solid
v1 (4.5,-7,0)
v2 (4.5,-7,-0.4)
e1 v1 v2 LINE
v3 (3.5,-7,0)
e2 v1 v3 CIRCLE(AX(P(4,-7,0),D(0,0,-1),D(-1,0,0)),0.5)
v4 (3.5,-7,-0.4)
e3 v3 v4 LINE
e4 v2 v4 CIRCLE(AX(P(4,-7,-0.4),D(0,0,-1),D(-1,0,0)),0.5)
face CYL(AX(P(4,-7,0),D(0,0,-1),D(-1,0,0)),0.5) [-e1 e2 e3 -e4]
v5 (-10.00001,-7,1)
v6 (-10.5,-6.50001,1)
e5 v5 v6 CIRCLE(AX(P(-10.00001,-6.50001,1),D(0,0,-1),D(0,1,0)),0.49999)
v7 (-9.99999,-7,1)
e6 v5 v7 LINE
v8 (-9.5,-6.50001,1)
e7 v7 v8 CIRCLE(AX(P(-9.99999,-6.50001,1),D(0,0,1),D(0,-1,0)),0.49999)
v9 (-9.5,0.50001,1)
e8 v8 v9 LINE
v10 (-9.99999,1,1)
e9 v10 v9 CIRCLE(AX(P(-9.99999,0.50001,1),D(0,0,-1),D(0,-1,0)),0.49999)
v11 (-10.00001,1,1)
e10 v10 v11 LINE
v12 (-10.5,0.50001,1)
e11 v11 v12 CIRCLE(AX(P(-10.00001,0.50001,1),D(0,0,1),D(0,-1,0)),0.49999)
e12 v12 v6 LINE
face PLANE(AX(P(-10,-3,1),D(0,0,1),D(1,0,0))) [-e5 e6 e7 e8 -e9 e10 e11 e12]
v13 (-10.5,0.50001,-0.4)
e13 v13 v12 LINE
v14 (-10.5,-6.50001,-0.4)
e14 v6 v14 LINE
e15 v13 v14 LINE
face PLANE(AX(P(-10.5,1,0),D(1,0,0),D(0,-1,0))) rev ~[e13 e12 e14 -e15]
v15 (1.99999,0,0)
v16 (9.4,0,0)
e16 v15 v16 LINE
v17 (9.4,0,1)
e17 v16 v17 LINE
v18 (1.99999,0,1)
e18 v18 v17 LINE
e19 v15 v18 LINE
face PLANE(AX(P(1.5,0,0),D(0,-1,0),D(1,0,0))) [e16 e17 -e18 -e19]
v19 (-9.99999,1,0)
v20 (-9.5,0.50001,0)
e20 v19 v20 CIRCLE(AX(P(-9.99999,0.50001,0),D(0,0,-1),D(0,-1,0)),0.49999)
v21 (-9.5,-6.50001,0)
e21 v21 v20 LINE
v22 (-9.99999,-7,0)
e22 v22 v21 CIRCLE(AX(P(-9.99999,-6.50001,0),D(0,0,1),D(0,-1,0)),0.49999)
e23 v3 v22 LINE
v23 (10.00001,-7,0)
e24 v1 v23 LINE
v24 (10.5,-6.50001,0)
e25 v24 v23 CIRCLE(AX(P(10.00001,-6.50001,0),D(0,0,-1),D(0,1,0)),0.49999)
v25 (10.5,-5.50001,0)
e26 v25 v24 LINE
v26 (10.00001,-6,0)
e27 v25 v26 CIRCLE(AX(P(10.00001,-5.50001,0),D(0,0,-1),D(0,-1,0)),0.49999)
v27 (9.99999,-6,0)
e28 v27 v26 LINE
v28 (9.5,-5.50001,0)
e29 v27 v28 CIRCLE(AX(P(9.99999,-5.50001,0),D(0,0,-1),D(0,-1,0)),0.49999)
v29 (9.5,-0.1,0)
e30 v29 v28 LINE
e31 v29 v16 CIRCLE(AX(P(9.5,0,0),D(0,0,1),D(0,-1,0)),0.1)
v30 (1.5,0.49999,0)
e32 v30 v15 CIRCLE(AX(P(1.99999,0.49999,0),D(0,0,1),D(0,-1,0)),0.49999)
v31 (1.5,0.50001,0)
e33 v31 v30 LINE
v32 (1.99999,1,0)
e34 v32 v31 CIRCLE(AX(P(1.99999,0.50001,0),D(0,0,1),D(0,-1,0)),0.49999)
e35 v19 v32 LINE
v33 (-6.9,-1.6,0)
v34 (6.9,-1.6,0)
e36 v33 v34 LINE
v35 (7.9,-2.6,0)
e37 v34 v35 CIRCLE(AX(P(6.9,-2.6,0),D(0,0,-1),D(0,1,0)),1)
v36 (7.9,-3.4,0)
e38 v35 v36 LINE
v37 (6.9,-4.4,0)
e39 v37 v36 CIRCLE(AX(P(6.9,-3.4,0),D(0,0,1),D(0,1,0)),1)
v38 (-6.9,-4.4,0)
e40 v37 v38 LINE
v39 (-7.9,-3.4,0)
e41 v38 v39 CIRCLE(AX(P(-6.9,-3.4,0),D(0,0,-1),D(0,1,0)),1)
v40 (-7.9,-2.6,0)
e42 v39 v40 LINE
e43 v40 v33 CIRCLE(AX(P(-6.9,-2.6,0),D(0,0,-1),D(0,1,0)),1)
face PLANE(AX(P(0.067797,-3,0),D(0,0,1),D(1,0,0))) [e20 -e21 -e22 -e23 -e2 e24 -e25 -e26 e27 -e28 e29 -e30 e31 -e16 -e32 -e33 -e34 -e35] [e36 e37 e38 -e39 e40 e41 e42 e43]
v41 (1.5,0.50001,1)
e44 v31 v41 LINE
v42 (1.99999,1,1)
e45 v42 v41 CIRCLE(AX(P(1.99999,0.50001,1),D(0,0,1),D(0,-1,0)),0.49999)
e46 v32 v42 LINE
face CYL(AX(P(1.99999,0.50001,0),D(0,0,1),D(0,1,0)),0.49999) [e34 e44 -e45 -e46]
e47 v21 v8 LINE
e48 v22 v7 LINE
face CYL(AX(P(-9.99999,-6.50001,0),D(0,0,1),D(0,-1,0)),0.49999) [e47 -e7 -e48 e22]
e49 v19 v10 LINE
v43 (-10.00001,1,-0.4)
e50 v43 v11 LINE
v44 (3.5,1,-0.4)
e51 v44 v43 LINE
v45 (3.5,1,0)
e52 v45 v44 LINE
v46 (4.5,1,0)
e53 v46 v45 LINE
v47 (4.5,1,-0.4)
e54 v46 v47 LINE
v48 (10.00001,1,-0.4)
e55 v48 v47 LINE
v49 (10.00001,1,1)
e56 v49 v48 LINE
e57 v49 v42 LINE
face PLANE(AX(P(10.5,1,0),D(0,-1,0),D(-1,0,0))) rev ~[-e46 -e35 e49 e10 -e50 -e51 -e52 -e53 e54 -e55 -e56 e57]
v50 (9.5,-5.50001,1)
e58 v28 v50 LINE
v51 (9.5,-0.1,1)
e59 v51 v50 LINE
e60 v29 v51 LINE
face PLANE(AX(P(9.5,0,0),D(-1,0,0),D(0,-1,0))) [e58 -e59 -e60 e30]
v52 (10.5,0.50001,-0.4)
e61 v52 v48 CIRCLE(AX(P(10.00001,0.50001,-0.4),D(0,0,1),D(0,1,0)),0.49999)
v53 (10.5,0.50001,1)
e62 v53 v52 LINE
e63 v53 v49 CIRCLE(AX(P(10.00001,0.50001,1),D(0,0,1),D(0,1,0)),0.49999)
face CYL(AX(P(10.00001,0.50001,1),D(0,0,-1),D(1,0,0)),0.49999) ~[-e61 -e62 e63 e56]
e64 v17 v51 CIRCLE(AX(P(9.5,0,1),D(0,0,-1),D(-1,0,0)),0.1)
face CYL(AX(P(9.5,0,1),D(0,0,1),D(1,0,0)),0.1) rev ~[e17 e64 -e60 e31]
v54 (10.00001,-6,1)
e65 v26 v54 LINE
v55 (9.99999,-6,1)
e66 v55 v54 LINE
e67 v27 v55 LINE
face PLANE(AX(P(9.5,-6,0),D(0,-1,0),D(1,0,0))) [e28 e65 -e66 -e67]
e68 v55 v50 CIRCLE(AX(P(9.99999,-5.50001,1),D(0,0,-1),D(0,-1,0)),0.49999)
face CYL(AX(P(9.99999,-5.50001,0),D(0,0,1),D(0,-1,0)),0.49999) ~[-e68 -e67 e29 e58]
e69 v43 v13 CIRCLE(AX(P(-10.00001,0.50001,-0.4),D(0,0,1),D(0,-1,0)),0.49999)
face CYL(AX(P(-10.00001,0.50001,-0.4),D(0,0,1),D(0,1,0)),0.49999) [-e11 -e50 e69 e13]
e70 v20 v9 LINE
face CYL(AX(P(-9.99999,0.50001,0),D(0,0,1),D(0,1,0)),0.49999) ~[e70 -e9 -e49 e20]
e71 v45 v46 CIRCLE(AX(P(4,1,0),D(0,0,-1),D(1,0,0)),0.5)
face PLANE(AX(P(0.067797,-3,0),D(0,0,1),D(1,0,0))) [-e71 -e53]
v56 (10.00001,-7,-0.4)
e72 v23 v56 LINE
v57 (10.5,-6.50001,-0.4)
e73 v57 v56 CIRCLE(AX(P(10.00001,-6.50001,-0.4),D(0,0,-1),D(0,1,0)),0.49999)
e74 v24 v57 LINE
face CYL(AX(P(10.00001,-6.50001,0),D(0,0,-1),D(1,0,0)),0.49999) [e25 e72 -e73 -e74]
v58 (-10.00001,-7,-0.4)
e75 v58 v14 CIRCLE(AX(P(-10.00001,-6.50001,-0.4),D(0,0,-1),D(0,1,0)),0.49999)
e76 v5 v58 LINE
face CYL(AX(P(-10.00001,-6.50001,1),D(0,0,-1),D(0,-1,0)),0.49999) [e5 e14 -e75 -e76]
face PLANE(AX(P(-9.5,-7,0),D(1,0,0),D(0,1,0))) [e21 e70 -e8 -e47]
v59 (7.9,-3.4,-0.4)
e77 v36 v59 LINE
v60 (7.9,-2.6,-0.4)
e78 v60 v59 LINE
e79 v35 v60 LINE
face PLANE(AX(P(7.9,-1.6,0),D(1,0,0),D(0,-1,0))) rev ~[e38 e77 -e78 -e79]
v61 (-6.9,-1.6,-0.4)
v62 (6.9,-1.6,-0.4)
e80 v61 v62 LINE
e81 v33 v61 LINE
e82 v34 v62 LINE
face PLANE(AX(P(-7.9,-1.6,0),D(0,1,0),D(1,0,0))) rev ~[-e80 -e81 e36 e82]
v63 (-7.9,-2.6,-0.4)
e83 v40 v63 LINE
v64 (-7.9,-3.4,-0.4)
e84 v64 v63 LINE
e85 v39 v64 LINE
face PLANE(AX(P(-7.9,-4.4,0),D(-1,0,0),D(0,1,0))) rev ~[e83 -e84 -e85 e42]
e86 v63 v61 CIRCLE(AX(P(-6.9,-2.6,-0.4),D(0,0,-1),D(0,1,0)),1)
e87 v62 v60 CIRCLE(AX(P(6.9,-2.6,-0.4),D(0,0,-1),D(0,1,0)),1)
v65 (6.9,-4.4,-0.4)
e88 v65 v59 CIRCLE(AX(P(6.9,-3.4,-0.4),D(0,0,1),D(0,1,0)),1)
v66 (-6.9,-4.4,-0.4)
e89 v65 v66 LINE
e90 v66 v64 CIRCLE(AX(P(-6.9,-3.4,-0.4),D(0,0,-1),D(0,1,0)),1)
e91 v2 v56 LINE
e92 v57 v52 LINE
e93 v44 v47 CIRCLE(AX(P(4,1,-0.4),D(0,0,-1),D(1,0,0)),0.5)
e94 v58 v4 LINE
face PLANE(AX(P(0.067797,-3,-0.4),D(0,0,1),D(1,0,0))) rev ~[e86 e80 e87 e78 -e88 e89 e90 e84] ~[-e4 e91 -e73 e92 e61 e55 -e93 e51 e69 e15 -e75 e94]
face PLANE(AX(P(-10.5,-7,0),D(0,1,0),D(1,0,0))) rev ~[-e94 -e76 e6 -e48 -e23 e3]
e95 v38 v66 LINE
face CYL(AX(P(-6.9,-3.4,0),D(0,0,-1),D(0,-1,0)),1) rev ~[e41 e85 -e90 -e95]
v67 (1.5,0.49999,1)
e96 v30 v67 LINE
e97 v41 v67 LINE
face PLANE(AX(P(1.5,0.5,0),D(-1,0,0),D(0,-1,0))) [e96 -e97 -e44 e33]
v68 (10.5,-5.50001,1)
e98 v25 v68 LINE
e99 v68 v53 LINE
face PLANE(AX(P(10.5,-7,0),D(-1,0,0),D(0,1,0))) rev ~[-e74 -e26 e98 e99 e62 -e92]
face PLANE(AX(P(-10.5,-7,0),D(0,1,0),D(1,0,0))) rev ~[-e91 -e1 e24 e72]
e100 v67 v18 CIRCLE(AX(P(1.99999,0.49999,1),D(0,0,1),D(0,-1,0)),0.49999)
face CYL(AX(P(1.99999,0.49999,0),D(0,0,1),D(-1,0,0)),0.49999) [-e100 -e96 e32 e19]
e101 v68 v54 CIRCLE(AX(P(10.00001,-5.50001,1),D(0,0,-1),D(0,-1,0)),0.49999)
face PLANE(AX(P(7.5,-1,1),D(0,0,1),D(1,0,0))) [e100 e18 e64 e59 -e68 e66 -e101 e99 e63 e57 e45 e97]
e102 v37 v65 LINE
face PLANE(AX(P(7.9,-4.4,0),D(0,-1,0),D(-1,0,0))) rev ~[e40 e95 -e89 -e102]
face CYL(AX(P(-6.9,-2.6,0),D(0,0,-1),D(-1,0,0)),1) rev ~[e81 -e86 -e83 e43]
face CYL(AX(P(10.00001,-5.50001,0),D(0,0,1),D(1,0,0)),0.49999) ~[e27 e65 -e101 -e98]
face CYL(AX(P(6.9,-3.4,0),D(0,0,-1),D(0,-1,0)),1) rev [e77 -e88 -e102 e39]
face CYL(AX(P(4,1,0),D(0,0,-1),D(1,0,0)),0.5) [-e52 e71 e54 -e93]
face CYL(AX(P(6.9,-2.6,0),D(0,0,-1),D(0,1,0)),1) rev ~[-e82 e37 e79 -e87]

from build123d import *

# Parameters (mm, degrees)
F4_W     = 3
F4_H     = 1
F6_R     = 1
F7_R     = 0.49999
F8_R     = 0.1
F9_DEPTH = 1


# Not quite as in the source:
# - a fillet or chamfer is up to 0.001 mm smaller than in the source, because OpenCascade refuses the exact size


with BuildPart() as f3:
    # F3: sweep along a path in F1
    with BuildLine(Plane.XZ) as f3_path:
        Line((0, 0), (0, -0.4))
    # F2 (on Top) → F3 (sweep)
    with BuildSketch(Plane.XY):
        Polygon((10.5, -7), (10.5, 1), (4.5, 1), (3.5, 1), (-10.5, 1), (-10.5, -7), (3.5, -7), (4.5, -7), align=None)
        Polygon((-7.9, -4.4), (-7.9, -1.6), (-4.5, -1.6), (4.5, -1.6), (7.9, -1.6), (7.9, -4.4), align=None, mode=Mode.SUBTRACT)
        with BuildLine():
            Line((3.5, 1), (4.5, 1))
            ThreePointArc((4.5, 1), (4, 1.5), (3.5, 1))
        make_face()
        with BuildLine():
            ThreePointArc((3.5, -7), (4, -7.5), (4.5, -7))
            Line((4.5, -7), (3.5, -7))
        make_face()
    sweep(path=f3_path.line)

    # F5: sweep along a path in F1
    with BuildLine(Plane.XZ) as f5_path:
        Line((0, 0), (0, 1))
    # F4 (on face) → F5 (sweep)
    with BuildSketch(Plane.XY):
        Polygon((4.5, 0), (9.5, 0), (9.5, -6), (10.5, -6), (10.5, 1), (4.5, 1), align=None)
        with Locations((3, 0.5)):
            Rectangle(F4_W, F4_H)
        Polygon((-9.5, -6), (-9.5, 0), (-9.5, 1), (-10.5, 1), (-10.5, -7), (-9.5, -7), align=None)
    sweep(path=f5_path.line)

    # F6
    f6_edges = [f3.edges().sort_by_distance(p)[0] for p in [
        (-7.9, -1.6, -0.2),
        (-7.9, -4.4, -0.2),
        (7.9, -1.6, -0.2),
        (7.9, -4.4, -0.2),
    ]]
    fillet(f6_edges, radius=F6_R)

    # F7 (radius 0.5 in the source; OpenCascade refuses exactly that, so slightly less here)
    f7_edges = [f3.edges().sort_by_distance(p)[0] for p in [
        (-10.5, -7, 0.3),
        (-10.5, 1, 0.3),
        (9.5, -6, 0.5),
        (10.5, -6, 0.5),
        (1.5, 0, 0.5),
        (10.5, -7, -0.2),
        (10.5, 1, 0.3),
        (1.5, 1, 0.5),
        (-9.5, 1, 0.5),
        (-9.5, -7, 0.5),
    ]]
    fillet(f7_edges, radius=F7_R)

    # F8 (on face) → F9 (cut, through all)
    with BuildSketch(Plane.XY.offset(1)):
        with Locations((9.5, 0)):
            Circle(F8_R)
    extrude(amount=-F9_DEPTH, mode=Mode.SUBTRACT)


solid = f3.part
